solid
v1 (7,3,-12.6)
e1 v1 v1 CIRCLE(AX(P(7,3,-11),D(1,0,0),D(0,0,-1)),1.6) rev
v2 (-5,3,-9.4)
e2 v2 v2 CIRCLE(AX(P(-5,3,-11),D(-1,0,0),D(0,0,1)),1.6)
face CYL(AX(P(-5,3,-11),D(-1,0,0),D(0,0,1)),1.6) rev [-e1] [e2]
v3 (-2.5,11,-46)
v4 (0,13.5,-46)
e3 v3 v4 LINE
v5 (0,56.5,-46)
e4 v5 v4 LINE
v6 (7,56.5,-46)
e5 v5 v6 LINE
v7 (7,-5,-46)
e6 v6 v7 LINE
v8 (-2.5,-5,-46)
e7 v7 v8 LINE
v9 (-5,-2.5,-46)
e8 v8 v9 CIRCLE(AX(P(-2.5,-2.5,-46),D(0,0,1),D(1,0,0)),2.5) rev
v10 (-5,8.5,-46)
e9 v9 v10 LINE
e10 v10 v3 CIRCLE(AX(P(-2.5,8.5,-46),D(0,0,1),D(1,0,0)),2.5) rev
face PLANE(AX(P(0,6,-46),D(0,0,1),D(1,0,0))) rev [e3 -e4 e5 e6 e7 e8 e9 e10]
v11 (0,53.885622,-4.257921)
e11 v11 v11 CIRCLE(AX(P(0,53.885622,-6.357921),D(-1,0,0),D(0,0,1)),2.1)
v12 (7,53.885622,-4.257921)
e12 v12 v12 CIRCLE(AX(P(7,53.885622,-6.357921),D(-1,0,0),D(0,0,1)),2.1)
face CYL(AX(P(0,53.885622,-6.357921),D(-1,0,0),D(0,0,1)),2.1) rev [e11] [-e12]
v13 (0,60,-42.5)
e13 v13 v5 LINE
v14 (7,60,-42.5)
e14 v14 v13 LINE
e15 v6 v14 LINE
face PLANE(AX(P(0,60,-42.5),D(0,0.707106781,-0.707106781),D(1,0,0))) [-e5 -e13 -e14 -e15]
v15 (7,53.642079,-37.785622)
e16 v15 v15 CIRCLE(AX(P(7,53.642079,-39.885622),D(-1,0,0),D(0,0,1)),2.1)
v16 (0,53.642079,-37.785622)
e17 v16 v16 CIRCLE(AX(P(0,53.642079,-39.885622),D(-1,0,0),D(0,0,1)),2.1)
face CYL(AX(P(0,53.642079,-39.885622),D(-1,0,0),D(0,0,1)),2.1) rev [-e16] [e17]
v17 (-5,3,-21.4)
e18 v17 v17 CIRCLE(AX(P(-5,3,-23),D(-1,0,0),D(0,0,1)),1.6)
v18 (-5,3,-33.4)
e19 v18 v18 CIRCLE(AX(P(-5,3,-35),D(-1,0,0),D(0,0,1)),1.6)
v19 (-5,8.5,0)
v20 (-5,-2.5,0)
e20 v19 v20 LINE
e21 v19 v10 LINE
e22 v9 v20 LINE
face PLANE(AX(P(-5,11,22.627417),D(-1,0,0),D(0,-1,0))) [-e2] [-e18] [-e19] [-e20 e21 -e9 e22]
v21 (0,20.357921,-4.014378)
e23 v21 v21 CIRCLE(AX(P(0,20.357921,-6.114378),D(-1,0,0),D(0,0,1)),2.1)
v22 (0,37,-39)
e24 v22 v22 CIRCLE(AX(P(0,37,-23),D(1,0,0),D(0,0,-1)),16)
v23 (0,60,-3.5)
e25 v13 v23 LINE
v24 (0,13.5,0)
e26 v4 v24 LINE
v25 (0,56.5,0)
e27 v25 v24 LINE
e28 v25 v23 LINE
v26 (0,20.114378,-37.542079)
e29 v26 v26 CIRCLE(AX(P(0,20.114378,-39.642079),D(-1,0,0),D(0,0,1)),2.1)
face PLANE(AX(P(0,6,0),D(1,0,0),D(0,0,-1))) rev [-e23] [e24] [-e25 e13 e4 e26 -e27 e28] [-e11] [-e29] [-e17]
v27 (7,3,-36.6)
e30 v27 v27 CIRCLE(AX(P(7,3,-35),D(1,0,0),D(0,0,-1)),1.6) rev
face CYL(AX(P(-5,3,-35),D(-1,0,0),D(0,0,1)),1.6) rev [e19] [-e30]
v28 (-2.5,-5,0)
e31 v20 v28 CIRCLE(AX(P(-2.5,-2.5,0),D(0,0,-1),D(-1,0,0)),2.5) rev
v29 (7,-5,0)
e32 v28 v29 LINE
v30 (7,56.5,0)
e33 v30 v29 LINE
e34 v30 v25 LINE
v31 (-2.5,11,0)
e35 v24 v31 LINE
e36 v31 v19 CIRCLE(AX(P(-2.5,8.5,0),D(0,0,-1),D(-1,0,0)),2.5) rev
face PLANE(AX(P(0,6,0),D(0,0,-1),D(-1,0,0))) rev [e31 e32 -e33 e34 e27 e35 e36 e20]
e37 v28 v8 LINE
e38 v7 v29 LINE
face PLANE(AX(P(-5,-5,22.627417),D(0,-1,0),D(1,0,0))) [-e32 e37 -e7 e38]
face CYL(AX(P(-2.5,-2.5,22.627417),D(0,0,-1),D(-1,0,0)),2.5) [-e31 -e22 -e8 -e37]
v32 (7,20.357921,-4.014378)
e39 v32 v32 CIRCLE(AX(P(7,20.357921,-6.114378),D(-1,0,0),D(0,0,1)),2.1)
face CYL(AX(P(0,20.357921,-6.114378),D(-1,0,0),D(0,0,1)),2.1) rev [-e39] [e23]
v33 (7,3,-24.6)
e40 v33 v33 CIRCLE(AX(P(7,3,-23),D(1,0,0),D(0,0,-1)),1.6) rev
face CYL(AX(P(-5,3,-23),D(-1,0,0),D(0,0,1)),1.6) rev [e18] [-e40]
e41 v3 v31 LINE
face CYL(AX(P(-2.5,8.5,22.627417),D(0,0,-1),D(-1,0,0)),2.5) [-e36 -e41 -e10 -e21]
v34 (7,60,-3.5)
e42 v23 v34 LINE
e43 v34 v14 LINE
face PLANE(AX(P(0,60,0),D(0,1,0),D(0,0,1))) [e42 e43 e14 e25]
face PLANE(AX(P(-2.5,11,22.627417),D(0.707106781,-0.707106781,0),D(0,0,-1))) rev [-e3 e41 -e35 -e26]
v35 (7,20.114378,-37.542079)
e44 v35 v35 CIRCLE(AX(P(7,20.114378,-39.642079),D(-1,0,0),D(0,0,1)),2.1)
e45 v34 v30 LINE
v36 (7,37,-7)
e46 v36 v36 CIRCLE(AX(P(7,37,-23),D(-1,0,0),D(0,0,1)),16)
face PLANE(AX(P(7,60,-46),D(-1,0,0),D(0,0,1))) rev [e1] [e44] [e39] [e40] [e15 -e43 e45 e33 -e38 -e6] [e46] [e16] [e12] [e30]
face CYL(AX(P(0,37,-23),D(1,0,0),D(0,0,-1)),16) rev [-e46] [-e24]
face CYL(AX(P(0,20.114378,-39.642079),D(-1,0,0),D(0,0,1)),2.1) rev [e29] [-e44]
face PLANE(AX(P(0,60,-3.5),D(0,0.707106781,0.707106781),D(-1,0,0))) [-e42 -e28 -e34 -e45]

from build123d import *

# Parameters (mm, degrees)
SKETCH1_W                                           = 92.56
SKETCH1_H                                           = 46
BOSS_EXTRUDE1_DEPTH                                 = 6
SKETCH2_W                                           = 7
SKETCH2_H                                           = 46
BOSS_EXTRUDE2_DEPTH                                 = 54
SKETCH3_R                                           = 16
CUT_EXTRUDE1_DEPTH                                  = 120.512985069
SKETCH4_R                                           = 16
CUT_EXTRUDE2_DEPTH                                  = 117.616266447
F_4_2_4_2_DIAMETER_HOLE1_D                          = 4.2
F_4_2_4_2_DIAMETER_HOLE2_D                          = 4.2
CHAMFER1_SIZE                                       = 3.5
CHAMFER2_SIZE                                       = 6
BOSS_EXTRUDE3_DEPTH                                 = 46
FILLET1_R                                           = 2.5
CHAMFER3_SIZE                                       = 2.5
FILLET2_R                                           = 2.5
M3_CLEARANCE_HOLE1_D                                = 3.2
M3_CLEARANCE_HOLE1_DEPTH                            = 30
M3_CLEARANCE_HOLE1_TIP                              = 0.96137699
CSK_FOR_M3_COUNTERSUNK_FLAT_HEAD_SCREW2_D           = 3.6
CSK_FOR_M3_COUNTERSUNK_FLAT_HEAD_SCREW2_DEPTH       = 30
CSK_FOR_M3_COUNTERSUNK_FLAT_HEAD_SCREW2_CSINK_D     = 6.3
CSK_FOR_M3_COUNTERSUNK_FLAT_HEAD_SCREW2_CSINK_ANGLE = 90
CSK_FOR_M3_COUNTERSUNK_FLAT_HEAD_SCREW2_TIP         = 1.081549114
SKETCH18_W                                          = 2.5
SKETCH18_H                                          = 5.65
CUT_EXTRUDE4_DEPTH                                  = 121.623188484


with BuildPart() as part:
    # Sketch1 → Boss-Extrude1 (new body)
    with BuildSketch(Plane(origin=(0, 0, 0), x_dir=(1, 0, 0), z_dir=(0, 1, 0))):
        with Locations((46.28, 23)):
            Rectangle(SKETCH1_W, SKETCH1_H)
    extrude(amount=BOSS_EXTRUDE1_DEPTH)

    # Sketch2 → Boss-Extrude2 (add)
    with BuildSketch(Plane(origin=(0, 6, 0), x_dir=(1, 0, 0), z_dir=(0, 1, 0))):
        with Locations((89.06, 23)):
            Rectangle(SKETCH2_W, SKETCH2_H)
        with Locations((3.5, 23)):
            Rectangle(SKETCH2_W, SKETCH2_H)
    extrude(amount=BOSS_EXTRUDE2_DEPTH)

    # Sketch3 → Cut-Extrude1 (cut, through all)
    with BuildSketch(Plane(origin=(92.56, 0, 0), x_dir=(0, 0, -1), z_dir=(1, 0, 0))):
        with Locations((23, 37)):
            Circle(SKETCH3_R)
    extrude(amount=-CUT_EXTRUDE1_DEPTH, mode=Mode.SUBTRACT)

    # Sketch4 → Cut-Extrude2 (cut, through all)
    with BuildSketch(Plane(origin=(0, 6, 0), x_dir=(1, 0, 0), z_dir=(0, 1, 0))):
        with Locations(Location((46.28, 23, 0), (0, 0, 270))):
            Circle(SKETCH4_R)
    extrude(amount=-CUT_EXTRUDE2_DEPTH, mode=Mode.SUBTRACT)

    # Ø4.2 (4.2) Diameter Hole1 (through all)
    with Locations(Plane(origin=(0, 0, 0), x_dir=(-1, 0, 0), z_dir=(0, -1, 0))):
        with Locations((-63.165621688, 39.642079068), (-29.637920932, 39.885621688), (-29.394378312, 6.357920932), (-62.922079068, 6.114378312)):
            Hole(F_4_2_4_2_DIAMETER_HOLE1_D / 2)

    # Ø4.2 (4.2) Diameter Hole2 (through all)
    with Locations(Plane.ZY):
        with Locations((-39.885621688, 53.642079068), (-6.357920932, 53.885621688), (-6.114378312, 20.357920932), (-39.642079068, 20.114378312)):
            Hole(F_4_2_4_2_DIAMETER_HOLE2_D / 2)

    # Chamfer1
    chamfer1_edges = [part.edges().sort_by_distance(p)[0] for p in [
        (89.06, 60, -46),
        (89.06, 60, 0),
        (3.5, 60, 0),
        (3.5, 60, -46),
    ]]
    chamfer(chamfer1_edges, length=CHAMFER1_SIZE)

    # Chamfer2
    chamfer2_edges = [part.edges().sort_by_distance(p)[0] for p in [
        (85.56, 6, -23),
        (7, 6, -23),
    ]]
    chamfer(chamfer2_edges, length=CHAMFER2_SIZE)

    # Sketch10 → Boss-Extrude3 (add)
    with BuildSketch(Plane(origin=(0, 0, -46), x_dir=(-1, 0, 0), z_dir=(0, 0, -1))):
        Polygon((0, 11), (5, 11), (5, -5), (-11, -5), (-11, 0), (0, 0), align=None)
        Polygon((-81.56, 0), (-92.56, 0), (-92.56, 11), (-97.56, 11), (-97.56, -5), (-81.56, -5), align=None)
    extrude(amount=-BOSS_EXTRUDE3_DEPTH)

    # Fillet1
    fillet1_edges = [part.edges().sort_by_distance(p)[0] for p in [
        (-5, 11, -23),
        (11, -5, -23),
        (81.56, -5, -23),
        (97.56, 11, -23),
    ]]
    fillet(fillet1_edges, radius=FILLET1_R)

    # Chamfer3
    chamfer3_edges = [part.edges().sort_by_distance(p)[0] for p in [
        (92.56, 11, -23),
        (81.56, 0, -23),
        (11, 0, -23),
        (0, 11, -23),
    ]]
    chamfer(chamfer3_edges, length=CHAMFER3_SIZE - 0.0001)  # a hair under: the kernel refuses the full size

    # Fillet2
    fillet2_edges = [part.edges().sort_by_distance(p)[0] for p in [
        (-5, -5, -23),
        (97.56, -5, -23),
    ]]
    fillet(fillet2_edges, radius=FILLET2_R)

    # M3 Clearance Hole1
    with Locations(Plane.ZY.offset(5)):
        with Locations((-11, 3), (-23, 3), (-35, 3)):
            Hole(M3_CLEARANCE_HOLE1_D / 2, depth=M3_CLEARANCE_HOLE1_DEPTH)
            with Locations((0, 0, -(M3_CLEARANCE_HOLE1_DEPTH + M3_CLEARANCE_HOLE1_TIP / 2))):  # 118° drill point
                Cone(0, M3_CLEARANCE_HOLE1_D / 2, M3_CLEARANCE_HOLE1_TIP, mode=Mode.SUBTRACT)

    # CSK for M3 Countersunk Flat Head Screw2
    with Locations(Plane(origin=(97.56, 0, 0), x_dir=(0, 0, -1), z_dir=(1, 0, 0))):
        with Locations((11, 3), (23, 3), (35, 3)):
            CounterSinkHole(CSK_FOR_M3_COUNTERSUNK_FLAT_HEAD_SCREW2_D / 2, CSK_FOR_M3_COUNTERSUNK_FLAT_HEAD_SCREW2_CSINK_D / 2, depth=CSK_FOR_M3_COUNTERSUNK_FLAT_HEAD_SCREW2_DEPTH, counter_sink_angle=CSK_FOR_M3_COUNTERSUNK_FLAT_HEAD_SCREW2_CSINK_ANGLE)
            with Locations((0, 0, -(CSK_FOR_M3_COUNTERSUNK_FLAT_HEAD_SCREW2_DEPTH + CSK_FOR_M3_COUNTERSUNK_FLAT_HEAD_SCREW2_TIP / 2))):  # 118° drill point
                Cone(0, CSK_FOR_M3_COUNTERSUNK_FLAT_HEAD_SCREW2_D / 2, CSK_FOR_M3_COUNTERSUNK_FLAT_HEAD_SCREW2_TIP, mode=Mode.SUBTRACT)

    # Sketch18 → Cut-Extrude4 (cut, through all)
    with BuildSketch(Plane(origin=(0, 6, 0), x_dir=(1, 0, 0), z_dir=(0, 1, 0))):
        with Locations((22, 23)):
            Rectangle(SKETCH18_W, SKETCH18_H)
        with Locations((22, 35)):
            Rectangle(SKETCH18_W, SKETCH18_H)
        with Locations((22, 11)):
            Rectangle(SKETCH18_W, SKETCH18_H)
    cut_extrude4 = extrude(amount=-CUT_EXTRUDE4_DEPTH, mode=Mode.SUBTRACT)

    # Mirror1: Cut-Extrude4 across plane
    add(cut_extrude4.mirror(Plane.ZY.offset(-46.28)), mode=Mode.SUBTRACT)

    # SurfaceCut3
    split(bisect_by=Plane(origin=(7, 0, 0), x_dir=(0, 0, -1), z_dir=(1, 0, 0)), keep=Keep.BOTTOM)


solid = part.part
